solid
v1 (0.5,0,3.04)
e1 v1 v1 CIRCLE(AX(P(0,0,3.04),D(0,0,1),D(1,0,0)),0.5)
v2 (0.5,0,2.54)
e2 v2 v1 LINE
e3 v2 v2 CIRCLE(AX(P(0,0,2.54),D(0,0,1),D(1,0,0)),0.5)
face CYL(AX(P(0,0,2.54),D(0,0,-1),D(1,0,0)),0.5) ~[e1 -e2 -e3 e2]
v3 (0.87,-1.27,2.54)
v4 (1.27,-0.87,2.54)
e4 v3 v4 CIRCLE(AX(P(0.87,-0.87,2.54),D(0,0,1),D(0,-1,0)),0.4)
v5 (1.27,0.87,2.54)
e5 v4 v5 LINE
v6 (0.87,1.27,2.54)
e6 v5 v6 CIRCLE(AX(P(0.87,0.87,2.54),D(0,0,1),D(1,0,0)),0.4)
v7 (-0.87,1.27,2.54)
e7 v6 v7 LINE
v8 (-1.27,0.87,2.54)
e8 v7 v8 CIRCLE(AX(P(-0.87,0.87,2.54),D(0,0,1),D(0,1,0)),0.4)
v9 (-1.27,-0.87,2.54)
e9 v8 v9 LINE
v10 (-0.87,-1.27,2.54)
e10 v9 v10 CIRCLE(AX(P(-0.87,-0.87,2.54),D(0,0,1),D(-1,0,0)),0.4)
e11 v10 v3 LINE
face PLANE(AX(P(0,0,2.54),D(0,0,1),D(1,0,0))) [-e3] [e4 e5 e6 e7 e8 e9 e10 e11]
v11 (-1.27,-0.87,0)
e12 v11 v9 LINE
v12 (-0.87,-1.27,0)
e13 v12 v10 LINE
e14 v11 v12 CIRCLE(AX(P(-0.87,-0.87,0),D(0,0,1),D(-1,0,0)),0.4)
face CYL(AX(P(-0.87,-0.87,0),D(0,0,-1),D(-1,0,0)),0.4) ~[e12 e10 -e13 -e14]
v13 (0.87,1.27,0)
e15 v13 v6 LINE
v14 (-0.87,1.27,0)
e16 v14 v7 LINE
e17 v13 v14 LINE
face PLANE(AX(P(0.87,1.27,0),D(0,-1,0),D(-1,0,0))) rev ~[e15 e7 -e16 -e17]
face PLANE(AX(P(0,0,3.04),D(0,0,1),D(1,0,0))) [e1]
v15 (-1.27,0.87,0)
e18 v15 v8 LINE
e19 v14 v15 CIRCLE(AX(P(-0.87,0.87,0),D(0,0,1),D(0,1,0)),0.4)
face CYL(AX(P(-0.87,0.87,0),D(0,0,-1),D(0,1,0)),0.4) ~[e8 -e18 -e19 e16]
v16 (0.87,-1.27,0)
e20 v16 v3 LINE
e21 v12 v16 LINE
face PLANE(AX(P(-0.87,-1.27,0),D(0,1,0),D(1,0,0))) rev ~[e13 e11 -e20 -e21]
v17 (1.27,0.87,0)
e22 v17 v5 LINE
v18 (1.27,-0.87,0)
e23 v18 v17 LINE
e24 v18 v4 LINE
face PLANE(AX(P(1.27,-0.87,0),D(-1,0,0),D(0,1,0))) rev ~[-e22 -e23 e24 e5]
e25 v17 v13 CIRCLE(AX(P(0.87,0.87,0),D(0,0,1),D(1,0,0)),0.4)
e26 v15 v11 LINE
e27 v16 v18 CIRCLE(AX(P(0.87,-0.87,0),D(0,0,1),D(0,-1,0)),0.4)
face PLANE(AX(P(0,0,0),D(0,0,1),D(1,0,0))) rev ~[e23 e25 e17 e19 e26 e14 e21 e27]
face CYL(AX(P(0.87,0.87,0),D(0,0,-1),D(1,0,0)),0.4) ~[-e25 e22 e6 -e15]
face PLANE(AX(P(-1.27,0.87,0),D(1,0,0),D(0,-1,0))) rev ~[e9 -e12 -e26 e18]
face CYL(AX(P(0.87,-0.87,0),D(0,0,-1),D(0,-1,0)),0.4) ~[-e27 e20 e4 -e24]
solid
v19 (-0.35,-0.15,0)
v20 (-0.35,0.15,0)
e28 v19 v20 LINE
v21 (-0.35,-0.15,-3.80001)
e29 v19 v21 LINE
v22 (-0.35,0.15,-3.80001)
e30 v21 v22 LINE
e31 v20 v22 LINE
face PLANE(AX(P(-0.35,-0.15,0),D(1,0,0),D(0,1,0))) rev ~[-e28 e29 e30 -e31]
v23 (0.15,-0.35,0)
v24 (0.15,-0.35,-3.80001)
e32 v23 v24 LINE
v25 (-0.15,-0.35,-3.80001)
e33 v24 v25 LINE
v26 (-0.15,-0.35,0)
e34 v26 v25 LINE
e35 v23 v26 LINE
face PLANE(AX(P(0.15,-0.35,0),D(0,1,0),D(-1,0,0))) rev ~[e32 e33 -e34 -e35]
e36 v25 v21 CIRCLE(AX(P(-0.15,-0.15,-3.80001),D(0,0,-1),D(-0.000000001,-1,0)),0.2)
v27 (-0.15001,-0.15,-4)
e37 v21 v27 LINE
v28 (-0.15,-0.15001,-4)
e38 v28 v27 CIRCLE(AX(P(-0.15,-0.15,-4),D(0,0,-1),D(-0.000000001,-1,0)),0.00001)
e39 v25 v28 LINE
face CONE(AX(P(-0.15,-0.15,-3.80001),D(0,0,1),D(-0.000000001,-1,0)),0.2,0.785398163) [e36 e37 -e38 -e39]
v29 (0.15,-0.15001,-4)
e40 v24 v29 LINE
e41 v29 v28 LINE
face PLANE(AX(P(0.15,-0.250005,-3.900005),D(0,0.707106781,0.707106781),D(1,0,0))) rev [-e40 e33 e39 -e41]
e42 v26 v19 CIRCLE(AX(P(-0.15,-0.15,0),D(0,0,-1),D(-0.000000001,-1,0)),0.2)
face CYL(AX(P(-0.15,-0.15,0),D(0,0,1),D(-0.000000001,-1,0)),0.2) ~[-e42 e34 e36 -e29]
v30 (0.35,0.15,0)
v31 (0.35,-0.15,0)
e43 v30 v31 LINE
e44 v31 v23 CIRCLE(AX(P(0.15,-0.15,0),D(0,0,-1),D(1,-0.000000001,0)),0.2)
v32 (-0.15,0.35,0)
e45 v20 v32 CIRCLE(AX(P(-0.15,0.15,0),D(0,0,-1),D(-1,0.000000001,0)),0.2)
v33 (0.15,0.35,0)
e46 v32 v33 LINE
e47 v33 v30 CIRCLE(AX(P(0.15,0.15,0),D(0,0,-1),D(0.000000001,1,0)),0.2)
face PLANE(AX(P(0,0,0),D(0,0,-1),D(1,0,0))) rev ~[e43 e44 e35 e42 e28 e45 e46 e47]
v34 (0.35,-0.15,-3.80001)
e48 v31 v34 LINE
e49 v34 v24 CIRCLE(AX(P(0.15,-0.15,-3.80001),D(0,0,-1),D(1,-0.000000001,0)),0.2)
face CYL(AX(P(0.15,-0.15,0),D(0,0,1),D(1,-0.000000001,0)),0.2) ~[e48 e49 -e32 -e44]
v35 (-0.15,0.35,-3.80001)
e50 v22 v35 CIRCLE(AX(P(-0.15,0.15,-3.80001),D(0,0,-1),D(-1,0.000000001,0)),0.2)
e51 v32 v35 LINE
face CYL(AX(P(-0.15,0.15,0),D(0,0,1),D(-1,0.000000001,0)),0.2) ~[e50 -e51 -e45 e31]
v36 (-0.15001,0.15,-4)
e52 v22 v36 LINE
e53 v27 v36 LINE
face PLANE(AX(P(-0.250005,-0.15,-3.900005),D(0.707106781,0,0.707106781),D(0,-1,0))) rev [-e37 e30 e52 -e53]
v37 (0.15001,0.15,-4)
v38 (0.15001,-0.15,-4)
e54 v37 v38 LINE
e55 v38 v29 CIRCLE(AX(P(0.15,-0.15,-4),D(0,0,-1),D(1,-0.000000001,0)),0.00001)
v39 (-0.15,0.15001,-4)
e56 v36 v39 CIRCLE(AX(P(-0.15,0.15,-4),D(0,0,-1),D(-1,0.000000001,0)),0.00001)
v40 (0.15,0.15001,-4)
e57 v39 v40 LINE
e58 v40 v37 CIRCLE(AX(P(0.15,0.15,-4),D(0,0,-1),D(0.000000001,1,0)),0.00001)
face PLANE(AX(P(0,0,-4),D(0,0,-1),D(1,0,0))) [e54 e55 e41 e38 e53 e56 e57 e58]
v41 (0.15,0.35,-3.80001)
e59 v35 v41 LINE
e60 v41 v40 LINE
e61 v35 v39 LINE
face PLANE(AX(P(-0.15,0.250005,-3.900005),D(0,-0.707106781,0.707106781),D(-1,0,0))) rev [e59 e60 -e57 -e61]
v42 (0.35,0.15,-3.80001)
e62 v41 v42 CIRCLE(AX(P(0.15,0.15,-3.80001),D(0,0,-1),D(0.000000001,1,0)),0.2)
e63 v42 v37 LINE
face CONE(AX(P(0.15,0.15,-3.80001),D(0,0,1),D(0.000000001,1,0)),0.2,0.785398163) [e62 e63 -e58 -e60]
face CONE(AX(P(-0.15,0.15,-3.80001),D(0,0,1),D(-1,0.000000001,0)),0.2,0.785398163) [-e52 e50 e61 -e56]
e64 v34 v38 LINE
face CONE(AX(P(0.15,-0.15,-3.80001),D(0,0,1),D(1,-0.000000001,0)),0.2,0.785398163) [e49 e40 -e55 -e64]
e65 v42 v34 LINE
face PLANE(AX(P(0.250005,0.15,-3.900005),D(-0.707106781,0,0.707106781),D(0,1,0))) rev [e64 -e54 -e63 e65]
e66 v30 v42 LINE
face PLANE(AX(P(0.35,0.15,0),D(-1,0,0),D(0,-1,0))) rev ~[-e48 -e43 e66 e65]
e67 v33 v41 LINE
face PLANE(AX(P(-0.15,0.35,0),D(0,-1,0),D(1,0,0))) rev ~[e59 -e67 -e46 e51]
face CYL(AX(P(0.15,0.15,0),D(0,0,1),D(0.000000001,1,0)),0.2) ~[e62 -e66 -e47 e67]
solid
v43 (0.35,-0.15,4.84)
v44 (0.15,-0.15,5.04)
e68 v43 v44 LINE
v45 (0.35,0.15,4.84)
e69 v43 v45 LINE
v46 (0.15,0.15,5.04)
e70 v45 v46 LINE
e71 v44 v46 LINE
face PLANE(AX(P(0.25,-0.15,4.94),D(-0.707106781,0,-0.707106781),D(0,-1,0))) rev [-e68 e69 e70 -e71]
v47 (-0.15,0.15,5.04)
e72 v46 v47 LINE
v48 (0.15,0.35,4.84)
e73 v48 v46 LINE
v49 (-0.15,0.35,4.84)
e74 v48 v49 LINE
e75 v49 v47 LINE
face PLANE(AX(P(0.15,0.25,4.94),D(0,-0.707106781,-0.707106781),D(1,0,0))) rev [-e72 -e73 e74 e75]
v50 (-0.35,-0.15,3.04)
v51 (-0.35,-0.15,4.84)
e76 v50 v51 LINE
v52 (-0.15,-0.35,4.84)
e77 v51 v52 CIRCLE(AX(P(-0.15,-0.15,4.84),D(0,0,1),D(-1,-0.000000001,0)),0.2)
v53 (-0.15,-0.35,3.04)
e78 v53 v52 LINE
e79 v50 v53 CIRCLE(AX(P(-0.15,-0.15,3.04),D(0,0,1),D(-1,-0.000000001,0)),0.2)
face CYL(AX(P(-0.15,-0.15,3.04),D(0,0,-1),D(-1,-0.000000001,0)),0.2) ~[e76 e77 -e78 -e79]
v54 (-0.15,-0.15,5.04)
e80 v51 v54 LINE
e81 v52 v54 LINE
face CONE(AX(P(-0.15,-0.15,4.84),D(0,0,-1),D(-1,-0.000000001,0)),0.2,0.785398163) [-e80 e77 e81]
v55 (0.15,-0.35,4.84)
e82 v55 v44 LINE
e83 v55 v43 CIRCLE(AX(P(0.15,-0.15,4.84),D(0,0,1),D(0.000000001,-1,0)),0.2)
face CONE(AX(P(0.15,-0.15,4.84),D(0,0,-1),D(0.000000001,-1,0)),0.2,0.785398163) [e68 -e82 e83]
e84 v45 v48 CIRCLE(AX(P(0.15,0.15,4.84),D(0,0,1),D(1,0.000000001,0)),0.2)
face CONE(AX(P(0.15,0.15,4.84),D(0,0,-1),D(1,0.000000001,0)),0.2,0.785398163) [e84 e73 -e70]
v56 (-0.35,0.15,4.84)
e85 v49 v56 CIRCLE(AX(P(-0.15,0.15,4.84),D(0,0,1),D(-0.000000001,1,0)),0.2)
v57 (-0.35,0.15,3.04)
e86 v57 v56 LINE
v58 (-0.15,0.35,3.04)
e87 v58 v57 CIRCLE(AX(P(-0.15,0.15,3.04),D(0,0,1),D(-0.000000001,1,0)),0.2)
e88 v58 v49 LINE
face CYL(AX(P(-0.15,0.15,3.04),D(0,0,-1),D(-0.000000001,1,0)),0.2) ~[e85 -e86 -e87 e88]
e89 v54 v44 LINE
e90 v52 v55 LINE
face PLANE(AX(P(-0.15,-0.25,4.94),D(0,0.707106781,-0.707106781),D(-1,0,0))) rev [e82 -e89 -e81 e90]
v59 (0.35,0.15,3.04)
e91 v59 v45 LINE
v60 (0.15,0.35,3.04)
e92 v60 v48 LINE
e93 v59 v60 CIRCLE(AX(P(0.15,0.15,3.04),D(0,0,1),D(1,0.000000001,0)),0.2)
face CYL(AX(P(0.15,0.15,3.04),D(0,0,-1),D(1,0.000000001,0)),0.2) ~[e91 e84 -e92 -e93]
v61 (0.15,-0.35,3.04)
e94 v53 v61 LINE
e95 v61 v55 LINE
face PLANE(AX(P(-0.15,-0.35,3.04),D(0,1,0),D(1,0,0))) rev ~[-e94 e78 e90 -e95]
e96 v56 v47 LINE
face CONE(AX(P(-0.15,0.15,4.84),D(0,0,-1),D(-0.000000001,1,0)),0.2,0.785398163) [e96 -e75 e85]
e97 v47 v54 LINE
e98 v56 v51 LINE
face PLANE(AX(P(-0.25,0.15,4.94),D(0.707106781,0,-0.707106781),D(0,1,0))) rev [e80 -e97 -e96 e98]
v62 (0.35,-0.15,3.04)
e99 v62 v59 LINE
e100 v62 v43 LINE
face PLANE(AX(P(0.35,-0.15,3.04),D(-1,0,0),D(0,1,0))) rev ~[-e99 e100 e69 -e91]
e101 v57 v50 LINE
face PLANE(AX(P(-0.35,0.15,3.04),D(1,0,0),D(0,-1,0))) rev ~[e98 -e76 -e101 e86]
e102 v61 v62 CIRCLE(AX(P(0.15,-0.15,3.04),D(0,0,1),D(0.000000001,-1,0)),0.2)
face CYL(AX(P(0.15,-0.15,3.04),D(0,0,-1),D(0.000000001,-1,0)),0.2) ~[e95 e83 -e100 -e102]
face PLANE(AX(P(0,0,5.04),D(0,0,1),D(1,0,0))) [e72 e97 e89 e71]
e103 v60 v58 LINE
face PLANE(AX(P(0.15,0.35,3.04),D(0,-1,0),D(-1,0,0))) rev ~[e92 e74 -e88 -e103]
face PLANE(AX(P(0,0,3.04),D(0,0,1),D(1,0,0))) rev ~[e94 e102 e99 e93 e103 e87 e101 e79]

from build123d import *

# Parameters (mm, degrees)
F1_DEPTH = 2.54
F2_R     = 0.5
F3_DEPTH = 0.5
F5_DEPTH = 2
F6_SIZE  = 0.2
F8_DEPTH = 4
F9_SIZE  = 0.19999


# Not quite as in the source:
# - a fillet or chamfer is up to 0.001 mm smaller than in the source, because OpenCascade refuses the exact size


with BuildPart() as f1:
    # F0 (on Top) → F1 (new body)
    with BuildSketch(Plane.XY):
        with BuildLine():
            Line((-0.87, -1.27), (0.87, -1.27))
            ThreePointArc((0.87, -1.27), (1.1528427125, -1.1528427125), (1.27, -0.87))
            Line((1.27, -0.87), (1.27, 0.87))
            ThreePointArc((1.27, 0.87), (1.1528427125, 1.1528427125), (0.87, 1.27))
            Line((0.87, 1.27), (-0.87, 1.27))
            ThreePointArc((-0.87, 1.27), (-1.1528427125, 1.1528427125), (-1.27, 0.87))
            Line((-1.27, 0.87), (-1.27, -0.87))
            ThreePointArc((-1.27, -0.87), (-1.1528427125, -1.1528427125), (-0.87, -1.27))
        make_face()
    extrude(amount=F1_DEPTH)

    # F2 (on face) → F3 (join)
    with BuildSketch(Plane.XY.offset(2.54)):
        Circle(F2_R)
    extrude(amount=F3_DEPTH)


with BuildPart() as f5:
    # F4 (on face) → F5 (new body)
    with BuildSketch(Plane.XY.offset(3.04)):
        with BuildLine():
            Line((0.15, 0.35), (-0.15, 0.35))
            ThreePointArc((-0.15, 0.35), (-0.2914213562, 0.2914213562), (-0.35, 0.15))
            Line((-0.35, 0.15), (-0.35, -0.15))
            ThreePointArc((-0.35, -0.15), (-0.2914213562, -0.2914213562), (-0.15, -0.35))
            Line((-0.15, -0.35), (0.15, -0.35))
            ThreePointArc((0.15, -0.35), (0.2914213562, -0.2914213562), (0.35, -0.15))
            Line((0.35, -0.15), (0.35, 0.15))
            ThreePointArc((0.35, 0.15), (0.2914213562, 0.2914213562), (0.15, 0.35))
        make_face()
    extrude(amount=F5_DEPTH)

    # F6
    f6_edges = [f5.edges().sort_by_distance(p)[0] for p in [
        (0.35, 0, 5.04),
        (0.291421, 0.291421, 5.04),
        (0, 0.35, 5.04),
        (-0.291421, 0.291421, 5.04),
        (-0.35, 0, 5.04),
        (-0.291421, -0.291421, 5.04),
        (0, -0.35, 5.04),
        (0.291421, -0.291421, 5.04),
    ]]
    chamfer(f6_edges, length=F6_SIZE)


with BuildPart() as f8:
    # F7 (on face) → F8 (new body)
    with BuildSketch(Plane(origin=(0, 0, 0), x_dir=(1, 0, 0), z_dir=(0, 0, -1))):
        with BuildLine():
            ThreePointArc((-0.35, -0.15), (-0.2914213562, -0.2914213562), (-0.15, -0.35))
            Line((-0.15, -0.35), (0.15, -0.35))
            ThreePointArc((0.15, -0.35), (0.2914213562, -0.2914213562), (0.35, -0.15))
            Line((0.35, -0.15), (0.35, 0.15))
            ThreePointArc((0.35, 0.15), (0.2914213562, 0.2914213562), (0.15, 0.35))
            Line((0.15, 0.35), (-0.15, 0.35))
            ThreePointArc((-0.15, 0.35), (-0.2914213562, 0.2914213562), (-0.35, 0.15))
            Line((-0.35, 0.15), (-0.35, -0.15))
        make_face()
    extrude(amount=F8_DEPTH)

    # F9 (size 0.2 in the source; OpenCascade refuses exactly that, so slightly less here)
    f9_edges = [f8.edges().sort_by_distance(p)[0] for p in [
        (-0.291421, 0.291421, -4),
        (0, 0.35, -4),
        (0.291421, 0.291421, -4),
        (0.35, 0, -4),
        (0.291421, -0.291421, -4),
        (0, -0.35, -4),
        (-0.291421, -0.291421, -4),
        (-0.35, 0, -4),
    ]]
    chamfer(f9_edges, length=F9_SIZE)


solid = Compound([f1.part, f5.part, f8.part])
